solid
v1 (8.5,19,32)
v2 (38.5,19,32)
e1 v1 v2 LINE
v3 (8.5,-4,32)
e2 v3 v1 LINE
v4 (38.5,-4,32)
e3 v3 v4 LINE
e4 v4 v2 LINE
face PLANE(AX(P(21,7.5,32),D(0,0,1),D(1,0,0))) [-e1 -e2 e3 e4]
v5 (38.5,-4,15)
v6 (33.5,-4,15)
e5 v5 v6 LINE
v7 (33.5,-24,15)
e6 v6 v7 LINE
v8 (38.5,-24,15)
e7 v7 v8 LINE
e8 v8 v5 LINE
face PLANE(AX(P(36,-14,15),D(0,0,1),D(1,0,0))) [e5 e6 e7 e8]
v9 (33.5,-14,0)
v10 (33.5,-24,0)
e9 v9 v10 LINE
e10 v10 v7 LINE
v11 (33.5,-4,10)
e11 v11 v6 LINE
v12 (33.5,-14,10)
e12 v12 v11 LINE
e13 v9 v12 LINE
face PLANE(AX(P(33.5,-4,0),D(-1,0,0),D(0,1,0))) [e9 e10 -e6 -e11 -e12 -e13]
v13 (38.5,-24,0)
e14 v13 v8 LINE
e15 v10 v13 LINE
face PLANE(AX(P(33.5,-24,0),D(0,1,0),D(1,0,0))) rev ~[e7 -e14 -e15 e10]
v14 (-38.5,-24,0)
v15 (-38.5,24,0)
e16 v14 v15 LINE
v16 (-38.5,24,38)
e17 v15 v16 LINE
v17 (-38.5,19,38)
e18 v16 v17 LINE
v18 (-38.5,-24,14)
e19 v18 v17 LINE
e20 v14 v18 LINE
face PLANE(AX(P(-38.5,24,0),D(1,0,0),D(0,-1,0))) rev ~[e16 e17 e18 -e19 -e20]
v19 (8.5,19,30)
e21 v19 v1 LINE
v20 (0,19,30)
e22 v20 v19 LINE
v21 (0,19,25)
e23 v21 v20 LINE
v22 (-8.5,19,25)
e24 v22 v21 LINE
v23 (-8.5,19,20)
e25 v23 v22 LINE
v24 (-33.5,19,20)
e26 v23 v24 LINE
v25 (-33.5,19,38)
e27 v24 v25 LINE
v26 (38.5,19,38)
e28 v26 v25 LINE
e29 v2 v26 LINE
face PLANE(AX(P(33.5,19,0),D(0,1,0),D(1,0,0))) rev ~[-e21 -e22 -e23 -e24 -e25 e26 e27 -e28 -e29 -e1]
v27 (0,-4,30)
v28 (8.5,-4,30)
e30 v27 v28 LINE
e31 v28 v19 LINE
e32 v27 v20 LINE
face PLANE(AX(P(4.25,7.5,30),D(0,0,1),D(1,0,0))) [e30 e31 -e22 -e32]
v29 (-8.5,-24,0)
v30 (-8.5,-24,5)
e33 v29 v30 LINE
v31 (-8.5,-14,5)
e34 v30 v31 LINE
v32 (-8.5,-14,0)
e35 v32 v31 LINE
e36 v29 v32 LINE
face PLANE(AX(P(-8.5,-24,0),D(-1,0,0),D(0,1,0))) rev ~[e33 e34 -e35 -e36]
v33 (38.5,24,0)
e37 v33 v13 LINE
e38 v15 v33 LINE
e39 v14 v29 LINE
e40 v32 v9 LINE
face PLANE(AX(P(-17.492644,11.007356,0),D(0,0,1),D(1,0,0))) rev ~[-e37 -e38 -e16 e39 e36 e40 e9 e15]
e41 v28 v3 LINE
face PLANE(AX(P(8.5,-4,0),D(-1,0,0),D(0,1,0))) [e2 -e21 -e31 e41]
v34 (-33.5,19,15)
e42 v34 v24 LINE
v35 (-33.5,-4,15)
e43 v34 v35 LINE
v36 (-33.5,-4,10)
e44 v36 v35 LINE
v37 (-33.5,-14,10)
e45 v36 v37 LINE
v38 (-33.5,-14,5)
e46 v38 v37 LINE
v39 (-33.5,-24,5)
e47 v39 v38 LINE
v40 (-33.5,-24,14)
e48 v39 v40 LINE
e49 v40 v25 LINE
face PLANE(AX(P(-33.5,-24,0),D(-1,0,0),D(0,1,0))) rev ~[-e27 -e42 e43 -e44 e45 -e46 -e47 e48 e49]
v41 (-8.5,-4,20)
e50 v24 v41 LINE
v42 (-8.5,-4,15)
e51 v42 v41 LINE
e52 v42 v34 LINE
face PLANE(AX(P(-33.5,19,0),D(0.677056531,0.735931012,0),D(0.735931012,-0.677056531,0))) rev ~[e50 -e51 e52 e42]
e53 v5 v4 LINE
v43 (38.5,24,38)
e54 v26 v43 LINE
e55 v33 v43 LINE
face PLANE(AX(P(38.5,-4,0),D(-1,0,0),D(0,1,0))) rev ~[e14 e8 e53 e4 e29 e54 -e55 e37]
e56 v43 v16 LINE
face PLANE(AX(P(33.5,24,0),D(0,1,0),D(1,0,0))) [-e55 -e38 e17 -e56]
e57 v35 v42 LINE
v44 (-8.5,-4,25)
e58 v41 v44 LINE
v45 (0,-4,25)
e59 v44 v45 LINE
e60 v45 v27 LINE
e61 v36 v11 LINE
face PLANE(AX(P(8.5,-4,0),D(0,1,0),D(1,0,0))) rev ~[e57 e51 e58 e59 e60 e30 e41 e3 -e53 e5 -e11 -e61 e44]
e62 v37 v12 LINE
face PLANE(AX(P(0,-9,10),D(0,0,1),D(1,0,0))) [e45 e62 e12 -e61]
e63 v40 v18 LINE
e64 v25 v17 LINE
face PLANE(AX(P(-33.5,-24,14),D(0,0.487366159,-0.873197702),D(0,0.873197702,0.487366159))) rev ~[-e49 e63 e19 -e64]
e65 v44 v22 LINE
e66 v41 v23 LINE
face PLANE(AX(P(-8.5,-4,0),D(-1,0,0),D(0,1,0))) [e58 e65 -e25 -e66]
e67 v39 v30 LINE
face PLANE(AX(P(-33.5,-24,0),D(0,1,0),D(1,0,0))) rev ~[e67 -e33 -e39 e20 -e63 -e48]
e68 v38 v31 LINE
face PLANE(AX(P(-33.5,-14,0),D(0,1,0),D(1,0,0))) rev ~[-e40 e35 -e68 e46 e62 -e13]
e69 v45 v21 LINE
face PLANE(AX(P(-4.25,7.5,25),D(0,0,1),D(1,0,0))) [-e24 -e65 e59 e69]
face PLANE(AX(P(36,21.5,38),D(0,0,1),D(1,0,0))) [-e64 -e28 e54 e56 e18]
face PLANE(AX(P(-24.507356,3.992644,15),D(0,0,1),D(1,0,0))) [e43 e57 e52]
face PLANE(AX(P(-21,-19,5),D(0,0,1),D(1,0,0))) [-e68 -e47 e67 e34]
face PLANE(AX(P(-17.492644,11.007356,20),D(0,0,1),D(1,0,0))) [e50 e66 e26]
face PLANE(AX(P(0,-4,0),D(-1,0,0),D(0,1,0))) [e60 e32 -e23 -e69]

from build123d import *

# Parameters (mm, degrees)
F1_DEPTH  = 38
F3_DEPTH  = 25
F4_DEPTH  = 38
F0_W      = 25
F0_H      = 10
F5_DEPTH  = 5
F6_DEPTH  = 10
F7_DEPTH  = 15
F0_W_2    = 5
F0_H_2    = 5
F8_DEPTH  = 38
F0_H_3    = 23
F9_DEPTH  = 32
F11_DEPTH = 15
F12_DEPTH = 20
F0_W_3    = 8.5
F13_DEPTH = 25
F14_DEPTH = 30
F15_DEPTH = 32


# Not quite as in the source:
# - the program builds the solid bodies; features that only make, move or delete a surface that nothing else refers to are left out


with BuildPart() as f1:
    # F0 (on Top) → F1 (new body)
    with BuildSketch(Plane.XY):
        Polygon((-33.5, 19), (-38.5, 19), (-38.5, -24), (-33.5, -24), (-33.5, -14), (-33.5, -4), align=None)
    extrude(amount=F1_DEPTH)

    # F2 (on face) → F3 (cut)
    with BuildSketch(Plane.YZ.offset(-33.5)):
        Polygon((-24, 38), (-24, 14), (19, 38), align=None)
    extrude(amount=-F3_DEPTH, mode=Mode.SUBTRACT)

    # F0 (on Top) → F4 (join)
    with BuildSketch(Plane.XY):
        Polygon((33.5, 19), (33.5, 24), (-38.5, 24), (-38.5, 19), (-33.5, 19), (-8.5, 19), (0, 19), (8.5, 19), align=None)
    extrude(amount=F4_DEPTH)

    # F0 (on Top) → F5 (join)
    with BuildSketch(Plane.XY):
        with Locations((-21, -19)):
            Rectangle(F0_W, F0_H)
    extrude(amount=F5_DEPTH)

    # F0 (on Top) → F6 (join)
    with BuildSketch(Plane.XY):
        Polygon((33.5, -14), (33.5, -4), (8.5, -4), (0, -4), (-8.5, -4), (-33.5, -4), (-33.5, -14), (-8.5, -14), align=None)
    extrude(amount=F6_DEPTH)

    # F0 (on Top) → F7 (join)
    with BuildSketch(Plane.XY):
        Polygon((38.5, -24), (38.5, -4), (33.5, -4), (33.5, -14), (33.5, -24), align=None)
    extrude(amount=F7_DEPTH)

    # F0 (on Top) → F8 (join)
    with BuildSketch(Plane.XY):
        with Locations((36, 21.5)):
            Rectangle(F0_W_2, F0_H_2)
    extrude(amount=F8_DEPTH)

    # F0 (on Top) → F9 (join)
    with BuildSketch(Plane.XY):
        with Locations((36, 7.5)):
            Rectangle(F0_W_2, F0_H_3)
    extrude(amount=F9_DEPTH)

    # F0 (on Top) → F11 (join)
    with BuildSketch(Plane.XY):
        Polygon((-8.5, -4), (-33.5, 19), (-33.5, -4), align=None)
    extrude(amount=F11_DEPTH)

    # F0 (on Top) → F12 (join)
    with BuildSketch(Plane.XY):
        Polygon((-8.5, 19), (-33.5, 19), (-8.5, -4), align=None)
    extrude(amount=F12_DEPTH)

    # F0 (on Top) → F13 (join)
    with BuildSketch(Plane.XY):
        with Locations((-4.25, 7.5)):
            Rectangle(F0_W_3, F0_H_3)
    extrude(amount=F13_DEPTH)

    # F0 (on Top) → F14 (join)
    with BuildSketch(Plane.XY):
        with Locations((4.25, 7.5)):
            Rectangle(F0_W_3, F0_H_3)
    extrude(amount=F14_DEPTH)

    # F0 (on Top) → F15 (join)
    with BuildSketch(Plane.XY):
        with Locations((21, 7.5)):
            Rectangle(F0_W, F0_H_3)
    extrude(amount=F15_DEPTH)


solid = f1.part
